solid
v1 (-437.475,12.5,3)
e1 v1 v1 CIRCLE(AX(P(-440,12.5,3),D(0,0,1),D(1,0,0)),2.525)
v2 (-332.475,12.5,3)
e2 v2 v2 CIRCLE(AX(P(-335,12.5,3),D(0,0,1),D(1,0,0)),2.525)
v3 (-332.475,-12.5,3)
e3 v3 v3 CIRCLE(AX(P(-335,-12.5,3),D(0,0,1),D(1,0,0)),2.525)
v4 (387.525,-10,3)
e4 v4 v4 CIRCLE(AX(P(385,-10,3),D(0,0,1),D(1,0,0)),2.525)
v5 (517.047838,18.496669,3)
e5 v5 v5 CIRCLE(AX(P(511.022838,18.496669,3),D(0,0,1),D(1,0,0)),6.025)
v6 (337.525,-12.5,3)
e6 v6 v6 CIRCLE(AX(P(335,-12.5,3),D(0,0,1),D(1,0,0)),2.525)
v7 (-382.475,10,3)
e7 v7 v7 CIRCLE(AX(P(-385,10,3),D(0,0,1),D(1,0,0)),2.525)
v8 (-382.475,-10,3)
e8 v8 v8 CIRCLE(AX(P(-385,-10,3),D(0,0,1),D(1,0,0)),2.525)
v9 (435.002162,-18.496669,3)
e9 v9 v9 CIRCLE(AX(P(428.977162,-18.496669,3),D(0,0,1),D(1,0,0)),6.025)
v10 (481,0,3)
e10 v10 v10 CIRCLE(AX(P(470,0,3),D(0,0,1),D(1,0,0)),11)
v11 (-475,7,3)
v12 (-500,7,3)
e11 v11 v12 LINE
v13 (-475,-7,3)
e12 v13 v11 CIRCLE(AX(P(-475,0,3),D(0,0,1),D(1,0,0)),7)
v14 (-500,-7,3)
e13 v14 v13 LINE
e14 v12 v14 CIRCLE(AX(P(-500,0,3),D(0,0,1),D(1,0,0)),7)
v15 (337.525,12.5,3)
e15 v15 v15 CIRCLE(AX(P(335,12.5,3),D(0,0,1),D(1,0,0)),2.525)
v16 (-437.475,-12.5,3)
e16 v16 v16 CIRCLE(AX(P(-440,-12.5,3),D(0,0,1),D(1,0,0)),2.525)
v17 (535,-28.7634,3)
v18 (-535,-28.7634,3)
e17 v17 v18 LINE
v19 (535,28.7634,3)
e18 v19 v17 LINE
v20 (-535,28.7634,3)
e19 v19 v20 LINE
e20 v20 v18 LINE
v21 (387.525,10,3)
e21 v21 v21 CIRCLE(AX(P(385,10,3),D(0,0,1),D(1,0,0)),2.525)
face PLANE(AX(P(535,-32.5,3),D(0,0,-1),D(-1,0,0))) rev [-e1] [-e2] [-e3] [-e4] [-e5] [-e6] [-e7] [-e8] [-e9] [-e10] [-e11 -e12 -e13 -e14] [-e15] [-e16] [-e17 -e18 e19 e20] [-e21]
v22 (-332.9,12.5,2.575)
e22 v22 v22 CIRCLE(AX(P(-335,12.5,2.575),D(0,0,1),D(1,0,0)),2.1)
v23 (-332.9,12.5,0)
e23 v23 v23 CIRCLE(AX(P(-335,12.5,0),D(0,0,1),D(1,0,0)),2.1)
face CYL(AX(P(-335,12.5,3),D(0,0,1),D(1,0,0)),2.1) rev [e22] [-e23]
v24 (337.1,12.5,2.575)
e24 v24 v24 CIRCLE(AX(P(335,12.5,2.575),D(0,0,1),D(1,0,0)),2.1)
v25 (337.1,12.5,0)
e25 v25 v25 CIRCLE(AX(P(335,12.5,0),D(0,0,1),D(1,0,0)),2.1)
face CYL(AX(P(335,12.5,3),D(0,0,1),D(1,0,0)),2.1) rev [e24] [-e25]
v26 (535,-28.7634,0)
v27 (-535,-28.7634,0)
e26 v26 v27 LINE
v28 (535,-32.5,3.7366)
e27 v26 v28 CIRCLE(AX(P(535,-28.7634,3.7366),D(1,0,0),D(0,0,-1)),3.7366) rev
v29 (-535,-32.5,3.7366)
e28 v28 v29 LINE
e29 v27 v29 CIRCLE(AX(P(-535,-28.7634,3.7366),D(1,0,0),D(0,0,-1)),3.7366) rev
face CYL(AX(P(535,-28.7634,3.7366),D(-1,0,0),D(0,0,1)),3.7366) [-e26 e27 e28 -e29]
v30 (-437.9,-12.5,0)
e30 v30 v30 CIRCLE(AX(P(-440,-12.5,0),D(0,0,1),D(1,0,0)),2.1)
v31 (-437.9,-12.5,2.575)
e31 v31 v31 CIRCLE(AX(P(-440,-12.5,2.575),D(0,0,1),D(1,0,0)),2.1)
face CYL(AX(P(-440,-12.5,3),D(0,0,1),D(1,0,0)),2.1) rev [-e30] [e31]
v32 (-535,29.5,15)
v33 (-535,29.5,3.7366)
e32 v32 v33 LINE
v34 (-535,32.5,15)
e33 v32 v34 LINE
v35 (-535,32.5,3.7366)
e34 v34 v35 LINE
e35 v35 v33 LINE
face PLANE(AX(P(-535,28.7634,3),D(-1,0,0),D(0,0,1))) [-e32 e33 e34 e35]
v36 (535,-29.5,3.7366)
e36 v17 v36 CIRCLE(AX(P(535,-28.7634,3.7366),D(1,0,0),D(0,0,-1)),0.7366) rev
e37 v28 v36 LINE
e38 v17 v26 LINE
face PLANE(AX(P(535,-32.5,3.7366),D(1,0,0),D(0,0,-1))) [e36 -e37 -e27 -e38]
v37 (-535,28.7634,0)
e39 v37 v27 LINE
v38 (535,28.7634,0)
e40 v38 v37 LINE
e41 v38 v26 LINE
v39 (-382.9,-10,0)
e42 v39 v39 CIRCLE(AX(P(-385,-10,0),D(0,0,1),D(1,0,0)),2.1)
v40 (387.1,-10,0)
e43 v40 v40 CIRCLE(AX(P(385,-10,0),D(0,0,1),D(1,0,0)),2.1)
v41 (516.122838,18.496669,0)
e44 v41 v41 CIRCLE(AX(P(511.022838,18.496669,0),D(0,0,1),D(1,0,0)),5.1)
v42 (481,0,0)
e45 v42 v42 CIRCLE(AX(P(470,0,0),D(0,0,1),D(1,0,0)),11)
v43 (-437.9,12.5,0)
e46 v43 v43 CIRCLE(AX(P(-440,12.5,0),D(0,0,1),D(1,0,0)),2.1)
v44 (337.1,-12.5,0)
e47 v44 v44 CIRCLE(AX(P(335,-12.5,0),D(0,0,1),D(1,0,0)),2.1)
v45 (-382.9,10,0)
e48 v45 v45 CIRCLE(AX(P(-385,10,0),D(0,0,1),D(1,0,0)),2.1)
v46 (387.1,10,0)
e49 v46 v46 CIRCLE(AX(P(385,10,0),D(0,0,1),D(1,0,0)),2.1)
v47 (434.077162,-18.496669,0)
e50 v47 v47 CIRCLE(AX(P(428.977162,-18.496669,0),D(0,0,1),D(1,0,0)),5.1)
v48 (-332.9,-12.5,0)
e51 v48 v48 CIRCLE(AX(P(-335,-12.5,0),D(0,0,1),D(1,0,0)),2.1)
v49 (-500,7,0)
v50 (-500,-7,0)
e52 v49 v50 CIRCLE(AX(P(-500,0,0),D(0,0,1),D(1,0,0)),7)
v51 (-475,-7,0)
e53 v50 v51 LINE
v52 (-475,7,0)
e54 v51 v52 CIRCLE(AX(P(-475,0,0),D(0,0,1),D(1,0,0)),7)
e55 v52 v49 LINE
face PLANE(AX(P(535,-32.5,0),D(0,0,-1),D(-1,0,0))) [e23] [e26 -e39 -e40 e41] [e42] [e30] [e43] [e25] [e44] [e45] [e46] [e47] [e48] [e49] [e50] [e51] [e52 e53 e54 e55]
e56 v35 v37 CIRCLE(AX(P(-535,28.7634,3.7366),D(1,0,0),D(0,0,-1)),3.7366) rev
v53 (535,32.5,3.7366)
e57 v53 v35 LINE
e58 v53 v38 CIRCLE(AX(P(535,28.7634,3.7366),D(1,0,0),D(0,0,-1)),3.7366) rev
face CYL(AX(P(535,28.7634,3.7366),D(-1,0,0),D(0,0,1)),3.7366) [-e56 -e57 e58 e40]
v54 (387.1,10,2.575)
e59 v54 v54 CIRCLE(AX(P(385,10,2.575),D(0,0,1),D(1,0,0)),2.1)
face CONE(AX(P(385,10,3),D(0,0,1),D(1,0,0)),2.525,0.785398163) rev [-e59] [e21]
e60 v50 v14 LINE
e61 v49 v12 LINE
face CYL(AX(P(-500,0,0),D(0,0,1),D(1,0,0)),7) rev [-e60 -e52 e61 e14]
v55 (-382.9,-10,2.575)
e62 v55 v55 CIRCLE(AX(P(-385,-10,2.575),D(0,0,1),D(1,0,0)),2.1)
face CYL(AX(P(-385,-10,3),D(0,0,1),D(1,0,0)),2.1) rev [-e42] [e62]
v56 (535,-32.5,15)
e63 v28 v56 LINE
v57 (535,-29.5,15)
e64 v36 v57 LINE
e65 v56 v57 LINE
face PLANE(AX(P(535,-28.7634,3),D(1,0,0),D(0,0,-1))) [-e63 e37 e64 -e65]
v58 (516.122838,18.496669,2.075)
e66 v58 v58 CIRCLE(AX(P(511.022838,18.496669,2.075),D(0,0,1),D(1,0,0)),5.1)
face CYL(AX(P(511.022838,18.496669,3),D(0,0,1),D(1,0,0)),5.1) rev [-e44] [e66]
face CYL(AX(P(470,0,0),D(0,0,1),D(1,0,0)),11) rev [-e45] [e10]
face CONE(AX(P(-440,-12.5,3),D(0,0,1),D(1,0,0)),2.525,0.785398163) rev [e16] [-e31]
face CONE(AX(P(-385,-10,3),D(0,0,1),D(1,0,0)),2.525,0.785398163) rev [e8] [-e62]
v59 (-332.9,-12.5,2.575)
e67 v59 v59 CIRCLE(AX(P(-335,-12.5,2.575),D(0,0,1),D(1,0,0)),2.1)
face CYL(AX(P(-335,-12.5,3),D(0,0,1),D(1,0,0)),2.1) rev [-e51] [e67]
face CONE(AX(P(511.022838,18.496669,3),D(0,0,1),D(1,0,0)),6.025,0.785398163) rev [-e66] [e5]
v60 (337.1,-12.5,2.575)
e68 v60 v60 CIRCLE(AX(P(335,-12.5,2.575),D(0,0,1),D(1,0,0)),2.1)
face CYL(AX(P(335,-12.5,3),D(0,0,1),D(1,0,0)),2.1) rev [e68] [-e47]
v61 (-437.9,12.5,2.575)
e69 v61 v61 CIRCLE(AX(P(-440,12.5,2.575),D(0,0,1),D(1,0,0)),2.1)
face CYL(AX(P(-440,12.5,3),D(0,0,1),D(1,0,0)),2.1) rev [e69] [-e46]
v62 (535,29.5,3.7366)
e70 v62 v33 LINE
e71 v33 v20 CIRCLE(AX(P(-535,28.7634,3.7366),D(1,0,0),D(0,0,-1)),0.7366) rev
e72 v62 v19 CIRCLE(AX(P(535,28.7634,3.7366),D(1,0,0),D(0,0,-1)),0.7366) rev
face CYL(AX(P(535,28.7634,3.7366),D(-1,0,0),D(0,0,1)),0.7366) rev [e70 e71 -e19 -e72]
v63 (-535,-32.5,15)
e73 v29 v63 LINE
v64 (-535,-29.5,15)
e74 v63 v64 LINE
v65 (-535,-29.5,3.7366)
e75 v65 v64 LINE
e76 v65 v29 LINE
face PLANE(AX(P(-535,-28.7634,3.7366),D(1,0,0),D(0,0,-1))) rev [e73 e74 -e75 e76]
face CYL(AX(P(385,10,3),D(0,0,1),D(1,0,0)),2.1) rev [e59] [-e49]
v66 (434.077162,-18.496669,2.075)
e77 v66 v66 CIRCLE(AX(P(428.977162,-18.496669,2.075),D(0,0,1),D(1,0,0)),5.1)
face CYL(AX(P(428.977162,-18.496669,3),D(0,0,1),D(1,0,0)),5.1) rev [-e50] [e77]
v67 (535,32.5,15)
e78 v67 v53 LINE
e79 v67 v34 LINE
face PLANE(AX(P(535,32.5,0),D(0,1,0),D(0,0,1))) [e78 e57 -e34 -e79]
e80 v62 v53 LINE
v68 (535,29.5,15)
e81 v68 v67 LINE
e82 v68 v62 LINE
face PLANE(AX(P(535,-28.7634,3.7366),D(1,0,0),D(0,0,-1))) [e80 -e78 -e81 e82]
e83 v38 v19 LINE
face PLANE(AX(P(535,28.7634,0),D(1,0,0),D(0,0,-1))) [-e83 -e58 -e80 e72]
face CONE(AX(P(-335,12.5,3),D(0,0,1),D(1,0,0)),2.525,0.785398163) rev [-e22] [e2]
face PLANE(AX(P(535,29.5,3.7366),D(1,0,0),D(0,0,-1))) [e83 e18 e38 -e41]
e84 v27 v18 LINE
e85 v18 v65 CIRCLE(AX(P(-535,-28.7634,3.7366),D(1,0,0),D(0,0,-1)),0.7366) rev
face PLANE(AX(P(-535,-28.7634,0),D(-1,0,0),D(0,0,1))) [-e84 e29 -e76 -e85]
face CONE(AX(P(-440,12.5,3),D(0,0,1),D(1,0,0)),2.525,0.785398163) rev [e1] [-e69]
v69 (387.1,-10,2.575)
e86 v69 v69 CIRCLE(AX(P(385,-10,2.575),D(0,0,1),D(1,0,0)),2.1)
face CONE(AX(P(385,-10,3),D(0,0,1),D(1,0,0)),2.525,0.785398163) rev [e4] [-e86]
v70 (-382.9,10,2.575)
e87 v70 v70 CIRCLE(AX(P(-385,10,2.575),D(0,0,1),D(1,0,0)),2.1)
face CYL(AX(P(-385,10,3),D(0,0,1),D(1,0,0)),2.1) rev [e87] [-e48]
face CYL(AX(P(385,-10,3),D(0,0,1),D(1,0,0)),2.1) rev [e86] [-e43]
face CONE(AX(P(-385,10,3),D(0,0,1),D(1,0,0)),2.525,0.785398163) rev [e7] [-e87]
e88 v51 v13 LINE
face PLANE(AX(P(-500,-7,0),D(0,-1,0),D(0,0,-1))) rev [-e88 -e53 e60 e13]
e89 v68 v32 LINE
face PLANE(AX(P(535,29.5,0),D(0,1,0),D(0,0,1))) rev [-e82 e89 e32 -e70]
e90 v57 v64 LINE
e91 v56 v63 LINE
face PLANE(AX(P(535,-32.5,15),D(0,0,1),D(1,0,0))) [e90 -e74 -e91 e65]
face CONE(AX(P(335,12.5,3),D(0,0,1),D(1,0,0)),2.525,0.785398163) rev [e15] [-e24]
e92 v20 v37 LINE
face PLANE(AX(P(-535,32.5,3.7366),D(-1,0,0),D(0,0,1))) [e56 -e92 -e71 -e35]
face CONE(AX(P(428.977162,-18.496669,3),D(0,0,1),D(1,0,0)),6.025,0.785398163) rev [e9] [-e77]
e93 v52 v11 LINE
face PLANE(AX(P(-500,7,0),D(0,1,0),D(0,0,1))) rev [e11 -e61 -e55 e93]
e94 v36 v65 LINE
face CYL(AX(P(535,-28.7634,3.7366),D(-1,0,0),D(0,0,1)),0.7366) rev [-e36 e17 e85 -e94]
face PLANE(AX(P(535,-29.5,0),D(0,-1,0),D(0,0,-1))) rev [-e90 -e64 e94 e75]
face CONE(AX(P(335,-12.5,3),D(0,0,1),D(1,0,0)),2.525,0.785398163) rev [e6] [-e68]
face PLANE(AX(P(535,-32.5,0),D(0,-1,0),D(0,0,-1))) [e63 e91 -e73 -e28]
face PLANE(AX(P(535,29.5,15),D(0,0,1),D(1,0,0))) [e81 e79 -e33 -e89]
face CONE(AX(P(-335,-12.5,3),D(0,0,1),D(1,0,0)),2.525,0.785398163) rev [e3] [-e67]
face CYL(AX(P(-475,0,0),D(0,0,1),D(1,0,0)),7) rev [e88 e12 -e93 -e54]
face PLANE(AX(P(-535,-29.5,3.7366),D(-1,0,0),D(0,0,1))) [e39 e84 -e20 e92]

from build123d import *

# Parameters (mm, degrees)
BASE_FLANGE1_DEPTH          = 535
CUT_EXTRUDE1_DEPTH          = 537.120555472
M5_TAPPED_HOLE1_D           = 4.2
M5_TAPPED_HOLE1_CSINK_D     = 5.05
M5_TAPPED_HOLE1_CSINK_ANGLE = 90
M5_TAPPED_HOLE2_D           = 4.2
M5_TAPPED_HOLE2_CSINK_D     = 5.05
M5_TAPPED_HOLE2_CSINK_ANGLE = 90
M5_TAPPED_HOLE3_D           = 4.2
M5_TAPPED_HOLE3_CSINK_D     = 5.05
M5_TAPPED_HOLE3_CSINK_ANGLE = 90
SKETCH16_R                  = 11
CUT_EXTRUDE2_DEPTH          = 537.120555472
M12_TAPPED_HOLE1_AT_2_COUNT = 2
M12_TAPPED_HOLE1_AT_2_PITCH = 90


# Sheet-metal steps are written as plain solids
with BuildPart() as part:
    # Sketch1 → Base-Flange1 (new, symmetric)
    with BuildSketch(Plane(origin=(0, 0, 0), x_dir=(0, 0, -1), z_dir=(1, 0, 0))):
        with BuildLine():
            Line((-15, -32.5), (-3.7366, -32.5))
            ThreePointArc((-3.7366, -32.5), (-1.094424801, -31.405575199), (0, -28.7634))
            Line((0, -28.7634), (0, 28.7634))
            ThreePointArc((0, 28.7634), (-1.094424801, 31.405575199), (-3.7366, 32.5))
            Line((-3.7366, 32.5), (-15, 32.5))
            Line((-15, 32.5), (-15, 29.5))
            Line((-15, 29.5), (-3.7366, 29.5))
            ThreePointArc((-3.7366, 29.5), (-3.215745145, 29.284254855), (-3, 28.7634))
            Line((-3, 28.7634), (-3, -28.7634))
            ThreePointArc((-3, -28.7634), (-3.215745145, -29.284254855), (-3.7366, -29.5))
            Line((-3.7366, -29.5), (-15, -29.5))
            Line((-15, -29.5), (-15, -32.5))
        make_face()
    extrude(amount=BASE_FLANGE1_DEPTH, both=True)

    # Sketch6 → Cut-Extrude1 (cut, through all)
    with BuildSketch(Plane.XY.offset(3)):
        with BuildLine():
            Line((-500, 7), (-475, 7))
            ThreePointArc((-475, 7), (-468, 0), (-475, -7))
            Line((-475, -7), (-500, -7))
            ThreePointArc((-500, -7), (-507, 0), (-500, 7))
        make_face()
    extrude(amount=-CUT_EXTRUDE1_DEPTH, mode=Mode.SUBTRACT)

    # M5 Tapped Hole1 (through all)
    with Locations(Plane.XY.offset(3)):
        with Locations((-440, 12.5), (-440, -12.5)):
            CounterSinkHole(M5_TAPPED_HOLE1_D / 2, M5_TAPPED_HOLE1_CSINK_D / 2, counter_sink_angle=M5_TAPPED_HOLE1_CSINK_ANGLE)

    # M5 Tapped Hole2 (through all)
    with Locations(Plane.XY.offset(3)):
        with Locations((-385, 10), (-385, -10)):
            m5_tapped_hole2 = CounterSinkHole(M5_TAPPED_HOLE2_D / 2, M5_TAPPED_HOLE2_CSINK_D / 2, counter_sink_angle=M5_TAPPED_HOLE2_CSINK_ANGLE)

    # M5 Tapped Hole3 (through all)
    with Locations(Plane.XY.offset(3)):
        with Locations((-335, 12.5), (-335, -12.5)):
            m5_tapped_hole3 = CounterSinkHole(M5_TAPPED_HOLE3_D / 2, M5_TAPPED_HOLE3_CSINK_D / 2, counter_sink_angle=M5_TAPPED_HOLE3_CSINK_ANGLE)

    # Mirror1: M5 Tapped Hole2, M5 Tapped Hole3 across plane
    add(m5_tapped_hole2.mirror(Plane(origin=(0, 0, 0), x_dir=(0, 0, 1), z_dir=(1, 0, 0))), mode=Mode.SUBTRACT)
    add(m5_tapped_hole3.mirror(Plane(origin=(0, 0, 0), x_dir=(0, 0, 1), z_dir=(1, 0, 0))), mode=Mode.SUBTRACT)

    # Sketch16 → Cut-Extrude2 (cut, through all)
    with BuildSketch(Plane.XY.offset(3)):
        with Locations((470, 0)):
            Circle(SKETCH16_R)
    extrude(amount=-CUT_EXTRUDE2_DEPTH, mode=Mode.SUBTRACT)

    # Sketch20 → M12 Tapped Hole1 (revolve, cut)
    with BuildSketch(Plane(origin=(428.977162095, -18.496669166, 3), x_dir=(0, -1, 0), z_dir=(1, 0, 0))):
        Polygon((0, 0), (0, 3), (5.1, 3), (5.1, 0.925), (6.025, 0), align=None)
    m12_tapped_hole1 = revolve(axis=Axis((428.977162095, -18.496669166, 9.35), (0, 0, -1)), mode=Mode.SUBTRACT)

    # M12 Tapped Hole1 at 2: M12 Tapped Hole1 ×2
    with Locations(*[Vector(0.9116186201067192, 0.4110370925776907, 0) * (i * M12_TAPPED_HOLE1_AT_2_PITCH) for i in range(1, M12_TAPPED_HOLE1_AT_2_COUNT)]):
        add(m12_tapped_hole1, mode=Mode.SUBTRACT)


solid = part.part
